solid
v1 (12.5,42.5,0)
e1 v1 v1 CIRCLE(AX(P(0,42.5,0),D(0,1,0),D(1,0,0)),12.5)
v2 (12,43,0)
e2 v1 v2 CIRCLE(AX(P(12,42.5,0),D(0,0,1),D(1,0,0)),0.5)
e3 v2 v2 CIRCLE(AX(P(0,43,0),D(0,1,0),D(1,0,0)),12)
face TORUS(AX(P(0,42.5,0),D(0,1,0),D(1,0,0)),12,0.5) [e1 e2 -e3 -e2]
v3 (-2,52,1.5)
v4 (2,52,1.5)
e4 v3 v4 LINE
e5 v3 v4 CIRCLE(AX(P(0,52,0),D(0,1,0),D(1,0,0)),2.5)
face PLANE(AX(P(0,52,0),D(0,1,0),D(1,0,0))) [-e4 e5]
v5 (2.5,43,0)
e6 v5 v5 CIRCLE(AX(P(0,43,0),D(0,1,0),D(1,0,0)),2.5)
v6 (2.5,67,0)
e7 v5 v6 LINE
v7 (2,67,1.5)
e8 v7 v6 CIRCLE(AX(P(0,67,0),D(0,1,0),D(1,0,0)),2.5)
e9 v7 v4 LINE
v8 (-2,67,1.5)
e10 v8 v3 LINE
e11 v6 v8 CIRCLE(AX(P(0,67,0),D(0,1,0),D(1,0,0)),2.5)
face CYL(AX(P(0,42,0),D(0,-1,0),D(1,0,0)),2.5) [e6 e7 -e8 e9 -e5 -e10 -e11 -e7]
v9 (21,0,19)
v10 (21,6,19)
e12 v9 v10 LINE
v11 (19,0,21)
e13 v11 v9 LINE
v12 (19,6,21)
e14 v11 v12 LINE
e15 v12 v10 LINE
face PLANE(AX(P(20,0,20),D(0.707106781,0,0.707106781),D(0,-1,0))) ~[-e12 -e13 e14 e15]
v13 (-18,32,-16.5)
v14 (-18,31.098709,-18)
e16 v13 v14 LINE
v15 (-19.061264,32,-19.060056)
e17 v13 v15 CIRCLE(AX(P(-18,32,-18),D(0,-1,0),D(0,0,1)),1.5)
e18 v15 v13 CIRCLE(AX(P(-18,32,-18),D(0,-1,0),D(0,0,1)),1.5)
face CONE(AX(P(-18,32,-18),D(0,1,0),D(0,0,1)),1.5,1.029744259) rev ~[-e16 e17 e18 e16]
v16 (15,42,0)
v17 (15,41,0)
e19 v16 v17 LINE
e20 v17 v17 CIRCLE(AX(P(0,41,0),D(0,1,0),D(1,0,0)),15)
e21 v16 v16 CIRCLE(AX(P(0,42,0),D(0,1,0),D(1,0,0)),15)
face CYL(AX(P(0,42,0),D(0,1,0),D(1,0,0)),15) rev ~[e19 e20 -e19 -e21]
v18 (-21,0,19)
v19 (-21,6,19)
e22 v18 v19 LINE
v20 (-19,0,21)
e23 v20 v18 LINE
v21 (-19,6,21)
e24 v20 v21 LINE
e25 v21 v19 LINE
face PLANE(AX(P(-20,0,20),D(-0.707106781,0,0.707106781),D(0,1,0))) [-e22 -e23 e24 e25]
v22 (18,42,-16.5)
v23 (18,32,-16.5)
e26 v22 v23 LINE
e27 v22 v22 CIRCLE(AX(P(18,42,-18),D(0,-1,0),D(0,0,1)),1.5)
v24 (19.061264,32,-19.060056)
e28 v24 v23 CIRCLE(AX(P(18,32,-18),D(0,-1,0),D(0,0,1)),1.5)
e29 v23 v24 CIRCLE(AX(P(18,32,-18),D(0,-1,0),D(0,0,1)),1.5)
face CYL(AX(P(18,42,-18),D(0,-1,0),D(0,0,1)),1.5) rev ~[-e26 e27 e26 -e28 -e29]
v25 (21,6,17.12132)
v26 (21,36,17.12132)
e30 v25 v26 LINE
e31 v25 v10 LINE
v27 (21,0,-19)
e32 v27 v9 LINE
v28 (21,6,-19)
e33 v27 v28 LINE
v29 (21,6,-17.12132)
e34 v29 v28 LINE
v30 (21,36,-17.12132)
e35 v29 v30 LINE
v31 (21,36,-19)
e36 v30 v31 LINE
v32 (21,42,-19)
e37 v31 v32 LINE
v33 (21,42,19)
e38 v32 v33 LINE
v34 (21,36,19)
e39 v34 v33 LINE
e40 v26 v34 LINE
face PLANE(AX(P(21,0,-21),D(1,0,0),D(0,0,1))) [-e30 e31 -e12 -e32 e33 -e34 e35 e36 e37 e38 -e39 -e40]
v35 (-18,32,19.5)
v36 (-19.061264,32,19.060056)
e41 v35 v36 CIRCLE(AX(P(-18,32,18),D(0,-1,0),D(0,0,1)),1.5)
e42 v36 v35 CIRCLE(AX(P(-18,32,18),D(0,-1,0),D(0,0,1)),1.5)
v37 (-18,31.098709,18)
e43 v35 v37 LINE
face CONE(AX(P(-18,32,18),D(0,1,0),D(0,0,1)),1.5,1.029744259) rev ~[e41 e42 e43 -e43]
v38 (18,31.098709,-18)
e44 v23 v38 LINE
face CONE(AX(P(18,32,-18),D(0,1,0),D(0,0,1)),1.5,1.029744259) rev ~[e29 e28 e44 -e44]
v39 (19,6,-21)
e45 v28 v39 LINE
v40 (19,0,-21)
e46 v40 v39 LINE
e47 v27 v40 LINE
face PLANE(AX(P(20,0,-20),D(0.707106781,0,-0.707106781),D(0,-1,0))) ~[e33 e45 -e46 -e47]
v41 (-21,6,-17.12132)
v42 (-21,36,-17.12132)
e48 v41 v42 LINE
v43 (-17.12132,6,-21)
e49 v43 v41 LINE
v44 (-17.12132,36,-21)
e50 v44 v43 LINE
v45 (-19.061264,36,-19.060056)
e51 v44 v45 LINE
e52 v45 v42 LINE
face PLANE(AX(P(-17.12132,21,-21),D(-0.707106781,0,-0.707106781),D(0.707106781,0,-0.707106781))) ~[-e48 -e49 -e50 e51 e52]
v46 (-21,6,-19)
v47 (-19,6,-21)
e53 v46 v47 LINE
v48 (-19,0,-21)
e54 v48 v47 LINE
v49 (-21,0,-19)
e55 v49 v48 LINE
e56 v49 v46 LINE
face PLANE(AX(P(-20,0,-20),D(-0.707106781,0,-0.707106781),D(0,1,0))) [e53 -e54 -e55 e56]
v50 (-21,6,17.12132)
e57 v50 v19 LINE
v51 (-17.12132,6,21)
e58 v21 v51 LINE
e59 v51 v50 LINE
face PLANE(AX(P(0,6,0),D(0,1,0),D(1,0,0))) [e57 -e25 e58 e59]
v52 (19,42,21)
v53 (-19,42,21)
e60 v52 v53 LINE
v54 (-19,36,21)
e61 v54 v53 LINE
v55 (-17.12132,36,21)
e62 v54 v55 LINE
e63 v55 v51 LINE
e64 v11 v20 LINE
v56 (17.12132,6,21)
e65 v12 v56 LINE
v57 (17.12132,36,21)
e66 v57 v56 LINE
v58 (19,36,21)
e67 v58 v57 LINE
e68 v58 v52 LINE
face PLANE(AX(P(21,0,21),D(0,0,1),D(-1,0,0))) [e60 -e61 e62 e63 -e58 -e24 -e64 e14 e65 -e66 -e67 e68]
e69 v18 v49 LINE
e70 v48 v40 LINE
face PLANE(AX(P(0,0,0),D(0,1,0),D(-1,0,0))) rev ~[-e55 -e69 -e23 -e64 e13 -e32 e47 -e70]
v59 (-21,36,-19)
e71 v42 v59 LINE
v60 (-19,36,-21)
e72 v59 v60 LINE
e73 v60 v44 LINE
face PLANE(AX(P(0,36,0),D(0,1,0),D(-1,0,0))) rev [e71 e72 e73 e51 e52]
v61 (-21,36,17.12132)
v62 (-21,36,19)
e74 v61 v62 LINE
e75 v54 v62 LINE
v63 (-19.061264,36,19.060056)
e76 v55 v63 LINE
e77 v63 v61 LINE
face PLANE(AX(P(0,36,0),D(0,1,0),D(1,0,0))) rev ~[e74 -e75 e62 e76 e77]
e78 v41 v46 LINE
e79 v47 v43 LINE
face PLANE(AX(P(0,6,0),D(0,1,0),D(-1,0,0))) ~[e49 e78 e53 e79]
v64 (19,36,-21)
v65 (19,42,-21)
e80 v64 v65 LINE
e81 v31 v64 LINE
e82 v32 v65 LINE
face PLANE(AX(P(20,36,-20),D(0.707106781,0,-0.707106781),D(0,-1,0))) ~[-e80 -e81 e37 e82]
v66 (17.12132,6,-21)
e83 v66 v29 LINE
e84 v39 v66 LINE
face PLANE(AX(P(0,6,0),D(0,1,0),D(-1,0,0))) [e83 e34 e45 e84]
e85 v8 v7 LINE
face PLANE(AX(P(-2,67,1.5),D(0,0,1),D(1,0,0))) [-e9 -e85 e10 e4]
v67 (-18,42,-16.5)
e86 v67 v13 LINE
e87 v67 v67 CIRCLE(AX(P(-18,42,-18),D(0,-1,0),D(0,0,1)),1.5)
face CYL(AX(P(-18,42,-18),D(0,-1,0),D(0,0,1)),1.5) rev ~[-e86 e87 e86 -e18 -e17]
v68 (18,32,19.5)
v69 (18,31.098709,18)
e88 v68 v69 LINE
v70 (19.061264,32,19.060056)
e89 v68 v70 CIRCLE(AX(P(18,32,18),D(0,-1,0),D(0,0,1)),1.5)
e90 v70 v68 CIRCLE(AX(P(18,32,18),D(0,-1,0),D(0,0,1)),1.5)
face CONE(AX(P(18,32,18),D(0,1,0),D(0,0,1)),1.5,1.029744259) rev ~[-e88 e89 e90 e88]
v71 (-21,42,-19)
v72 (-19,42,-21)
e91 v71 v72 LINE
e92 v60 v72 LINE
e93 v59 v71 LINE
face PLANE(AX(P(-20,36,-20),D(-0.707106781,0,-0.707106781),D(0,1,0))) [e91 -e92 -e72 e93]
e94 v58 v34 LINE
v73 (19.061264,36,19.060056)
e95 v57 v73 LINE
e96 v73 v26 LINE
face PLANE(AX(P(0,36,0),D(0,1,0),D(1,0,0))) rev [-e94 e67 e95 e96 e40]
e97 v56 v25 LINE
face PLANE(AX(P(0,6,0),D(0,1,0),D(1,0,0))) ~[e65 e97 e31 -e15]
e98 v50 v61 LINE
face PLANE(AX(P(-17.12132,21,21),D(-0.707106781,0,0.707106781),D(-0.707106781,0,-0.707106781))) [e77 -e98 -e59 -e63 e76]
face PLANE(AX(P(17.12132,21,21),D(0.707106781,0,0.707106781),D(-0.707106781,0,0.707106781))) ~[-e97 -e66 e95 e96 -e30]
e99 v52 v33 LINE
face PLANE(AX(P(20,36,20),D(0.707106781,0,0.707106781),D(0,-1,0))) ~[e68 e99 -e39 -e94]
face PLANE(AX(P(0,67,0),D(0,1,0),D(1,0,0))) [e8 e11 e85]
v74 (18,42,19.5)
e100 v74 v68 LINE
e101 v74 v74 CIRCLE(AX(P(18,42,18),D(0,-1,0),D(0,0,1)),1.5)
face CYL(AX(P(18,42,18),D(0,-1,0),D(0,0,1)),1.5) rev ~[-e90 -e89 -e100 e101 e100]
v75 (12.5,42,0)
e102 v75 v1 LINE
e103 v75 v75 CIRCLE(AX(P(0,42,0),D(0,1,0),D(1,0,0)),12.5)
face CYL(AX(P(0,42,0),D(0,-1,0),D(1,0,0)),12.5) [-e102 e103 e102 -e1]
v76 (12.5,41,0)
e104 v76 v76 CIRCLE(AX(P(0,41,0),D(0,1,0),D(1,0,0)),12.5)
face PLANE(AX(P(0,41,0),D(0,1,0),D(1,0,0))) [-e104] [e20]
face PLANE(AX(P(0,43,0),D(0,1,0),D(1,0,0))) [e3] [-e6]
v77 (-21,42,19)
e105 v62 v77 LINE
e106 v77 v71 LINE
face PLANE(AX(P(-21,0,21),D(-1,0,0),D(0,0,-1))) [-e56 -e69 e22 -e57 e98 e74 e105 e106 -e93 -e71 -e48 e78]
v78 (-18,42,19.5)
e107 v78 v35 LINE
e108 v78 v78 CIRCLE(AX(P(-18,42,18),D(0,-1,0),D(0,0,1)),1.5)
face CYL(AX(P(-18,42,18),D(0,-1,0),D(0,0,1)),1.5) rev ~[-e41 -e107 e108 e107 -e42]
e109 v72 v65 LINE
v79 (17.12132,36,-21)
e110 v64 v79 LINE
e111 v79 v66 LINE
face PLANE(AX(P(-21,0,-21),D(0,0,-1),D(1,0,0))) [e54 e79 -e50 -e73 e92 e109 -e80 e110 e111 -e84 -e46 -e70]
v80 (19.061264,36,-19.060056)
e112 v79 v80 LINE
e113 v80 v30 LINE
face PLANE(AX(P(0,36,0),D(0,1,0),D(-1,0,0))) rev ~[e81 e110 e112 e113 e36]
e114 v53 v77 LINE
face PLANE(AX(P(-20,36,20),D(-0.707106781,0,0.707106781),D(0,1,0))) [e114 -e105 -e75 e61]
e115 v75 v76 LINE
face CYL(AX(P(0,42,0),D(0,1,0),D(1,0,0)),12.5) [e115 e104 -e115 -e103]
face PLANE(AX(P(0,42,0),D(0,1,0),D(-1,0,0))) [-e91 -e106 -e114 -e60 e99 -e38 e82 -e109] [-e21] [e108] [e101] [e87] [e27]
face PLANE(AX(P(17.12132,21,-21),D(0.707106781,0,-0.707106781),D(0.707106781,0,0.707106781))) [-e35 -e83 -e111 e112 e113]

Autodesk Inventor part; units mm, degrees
sketch "草图1" plane through (0, 0, 0) normal (0, 1, 0) x (-1, 0, 0)
  line L0 (-21, 21) -> (21, 21)
  line L1 (21, 21) -> (21, -21)
  line L2 (21, -21) -> (-21, -21)
  line L3 (-21, -21) -> (-21, 21)
  line L4 (-21, 21) -> (21, -21) construction
  line L5 (21, 21) -> (-21, -21) construction
  point P0 (0, 0)
  dimension "d0" = 42
extrude "拉伸1" add sketch "草图1" along normal blind 42
sketch "草图2" plane through (0, 42, 0) normal (0, 1, 0) x (1, 0, 0)
  circle A0 centre (0, 0) radius 15
  circle A1 centre (0, 0) radius 12.5
  dimension "d3" = 30
  dimension "d4" = 25
extrude "拉伸2" cut sketch "草图2" against normal blind 1
sketch "草图3" plane through (0, 42, 0) normal (0, 1, 0) x (1, 0, 0)
  circle A0 centre (-18, -18) radius 1.5
  line L0 (0, 29.4) -> (0, -29.4) construction
  line L1 (-29.4, 0) -> (29.4, 0) construction
  circle A1 centre (18, -18) radius 1.5
  line L2 (29.4, 0) -> (-29.4, 0) construction
  circle A2 centre (-18, 18) radius 1.5
  circle A3 centre (18, 18) radius 1.5
  point P0 (0, 0)
  dimension "d8" = 3
  dimension "d9" = 18
  dimension "d10" = 18
hole "孔1" at (18, 42, 18) at (-18, 42, 18) at (-18, 42, -18) at (18, 42, -18) direction (0, -1, 0) diameter 3 depth 10 tip angle 118
thread "螺纹1" size "M3x0.5" class "6H" standard "ANSI Metric M Profile" full length
thread "螺纹2" size "M3x0.5" class "6H" standard "ANSI Metric M Profile" full length
thread "螺纹3" size "M3x0.5" class "6H" standard "ANSI Metric M Profile" full length
thread "螺纹4" size "M3x0.5" class "6H" standard "ANSI Metric M Profile" full length
ref_plane "工作平面2" through (0, 42, 0) normal (0, 1, 0) x (1, 0, 0)
sketch "草图4" plane through (0, 42, 0) normal (0, 1, 0) x (1, 0, 0)
  circle A0 centre (0, 0) radius 2.5
  dimension "d26" = 5
extrude "拉伸3" add sketch "草图4" along normal blind 25
ref_plane "工作平面3" through (0, 67, 0) normal (0, 1, 0) x (1, 0, 0)
sketch "草图5" plane through (0, 67, 0) normal (0, 1, 0) x (1, 0, 0)
  circle A0 centre (0, 0) radius 2.5 projected
  line L0 (-2, -1.5) -> (2, -1.5)
  dimension "d29" = 1.5
extrude "拉伸4" cut sketch "草图5" against normal blind 15 contours L0 A0 picked at (-0.533956, -1.639793)
ref_plane "工作平面1" through (0, 21, 0) normal (0, 1, 0) x (1, 0, 0)
sketch "草图6" plane through (0, 21, 0) normal (0, 1, 0) x (1, 0, 0)
  circle A0 centre (-18, -18) radius 1.5
  line L0 (0, 29.4) -> (0, -29.4) construction
  line L1 (29.4, 0) -> (-29.4, 0) construction
  line L2 (-21, 21) -> (-21, -21)
  line L3 (-21, -21) -> (21, -21)
  line L4 (21, -21) -> (21, 21)
  line L5 (21, 21) -> (-21, 21)
  line L6 (-17.12132, -21) -> (-21, -17.12132)
  line L7 (-17.12132, 21) -> (-21, 17.12132)
  line L8 (17.12132, -21) -> (21, -17.12132)
  line L9 (17.12132, 21) -> (21, 17.12132)
  point P0 (0, 0)
  dimension "d34" = 45
sketch "草图6 outline for 拉伸5" plane through (0, 21, 0) normal (0, 1, 0) x (1, 0, 0)
  line L0 (-21, -17.12132) -> (-21, -21)
  line L1 (-17.12132, -21) -> (-21, -17.12132)
  line L2 (-21, -21) -> (-17.12132, -21)
extrude "拉伸5" cut sketch "草图6 outline for 拉伸5" along normal mid plane 30
mirror "镜像1" about plane through (0, 0, 0) normal (1, 0, 0) of "拉伸5"
mirror "镜像2" about plane through (0, 0, 0) normal (0, 0, 1) of "拉伸5", "镜像1"
chamfer "倒角1" distance 2 angle 45 8 edges at (21, 39, -21) (21, 3, -21) (-21, 3, -21) (-21, 39, -21) (21, 39, 21) (21, 3, 21) (-21, 39, 21) (-21, 3, 21)
sketch "草图7" plane through (0, 42, 0) normal (0, 1, 0) x (1, 0, 0)
  circle A0 centre (0, 0) radius 2.5 projected
  circle A1 centre (0, 0) radius 12.5 projected
extrude "拉伸6" add sketch "草图7" along normal blind 1
fillet "圆角2" radius 0.5 1 edges at (-12.5, 43, 0)
properties part number "步进电机"
